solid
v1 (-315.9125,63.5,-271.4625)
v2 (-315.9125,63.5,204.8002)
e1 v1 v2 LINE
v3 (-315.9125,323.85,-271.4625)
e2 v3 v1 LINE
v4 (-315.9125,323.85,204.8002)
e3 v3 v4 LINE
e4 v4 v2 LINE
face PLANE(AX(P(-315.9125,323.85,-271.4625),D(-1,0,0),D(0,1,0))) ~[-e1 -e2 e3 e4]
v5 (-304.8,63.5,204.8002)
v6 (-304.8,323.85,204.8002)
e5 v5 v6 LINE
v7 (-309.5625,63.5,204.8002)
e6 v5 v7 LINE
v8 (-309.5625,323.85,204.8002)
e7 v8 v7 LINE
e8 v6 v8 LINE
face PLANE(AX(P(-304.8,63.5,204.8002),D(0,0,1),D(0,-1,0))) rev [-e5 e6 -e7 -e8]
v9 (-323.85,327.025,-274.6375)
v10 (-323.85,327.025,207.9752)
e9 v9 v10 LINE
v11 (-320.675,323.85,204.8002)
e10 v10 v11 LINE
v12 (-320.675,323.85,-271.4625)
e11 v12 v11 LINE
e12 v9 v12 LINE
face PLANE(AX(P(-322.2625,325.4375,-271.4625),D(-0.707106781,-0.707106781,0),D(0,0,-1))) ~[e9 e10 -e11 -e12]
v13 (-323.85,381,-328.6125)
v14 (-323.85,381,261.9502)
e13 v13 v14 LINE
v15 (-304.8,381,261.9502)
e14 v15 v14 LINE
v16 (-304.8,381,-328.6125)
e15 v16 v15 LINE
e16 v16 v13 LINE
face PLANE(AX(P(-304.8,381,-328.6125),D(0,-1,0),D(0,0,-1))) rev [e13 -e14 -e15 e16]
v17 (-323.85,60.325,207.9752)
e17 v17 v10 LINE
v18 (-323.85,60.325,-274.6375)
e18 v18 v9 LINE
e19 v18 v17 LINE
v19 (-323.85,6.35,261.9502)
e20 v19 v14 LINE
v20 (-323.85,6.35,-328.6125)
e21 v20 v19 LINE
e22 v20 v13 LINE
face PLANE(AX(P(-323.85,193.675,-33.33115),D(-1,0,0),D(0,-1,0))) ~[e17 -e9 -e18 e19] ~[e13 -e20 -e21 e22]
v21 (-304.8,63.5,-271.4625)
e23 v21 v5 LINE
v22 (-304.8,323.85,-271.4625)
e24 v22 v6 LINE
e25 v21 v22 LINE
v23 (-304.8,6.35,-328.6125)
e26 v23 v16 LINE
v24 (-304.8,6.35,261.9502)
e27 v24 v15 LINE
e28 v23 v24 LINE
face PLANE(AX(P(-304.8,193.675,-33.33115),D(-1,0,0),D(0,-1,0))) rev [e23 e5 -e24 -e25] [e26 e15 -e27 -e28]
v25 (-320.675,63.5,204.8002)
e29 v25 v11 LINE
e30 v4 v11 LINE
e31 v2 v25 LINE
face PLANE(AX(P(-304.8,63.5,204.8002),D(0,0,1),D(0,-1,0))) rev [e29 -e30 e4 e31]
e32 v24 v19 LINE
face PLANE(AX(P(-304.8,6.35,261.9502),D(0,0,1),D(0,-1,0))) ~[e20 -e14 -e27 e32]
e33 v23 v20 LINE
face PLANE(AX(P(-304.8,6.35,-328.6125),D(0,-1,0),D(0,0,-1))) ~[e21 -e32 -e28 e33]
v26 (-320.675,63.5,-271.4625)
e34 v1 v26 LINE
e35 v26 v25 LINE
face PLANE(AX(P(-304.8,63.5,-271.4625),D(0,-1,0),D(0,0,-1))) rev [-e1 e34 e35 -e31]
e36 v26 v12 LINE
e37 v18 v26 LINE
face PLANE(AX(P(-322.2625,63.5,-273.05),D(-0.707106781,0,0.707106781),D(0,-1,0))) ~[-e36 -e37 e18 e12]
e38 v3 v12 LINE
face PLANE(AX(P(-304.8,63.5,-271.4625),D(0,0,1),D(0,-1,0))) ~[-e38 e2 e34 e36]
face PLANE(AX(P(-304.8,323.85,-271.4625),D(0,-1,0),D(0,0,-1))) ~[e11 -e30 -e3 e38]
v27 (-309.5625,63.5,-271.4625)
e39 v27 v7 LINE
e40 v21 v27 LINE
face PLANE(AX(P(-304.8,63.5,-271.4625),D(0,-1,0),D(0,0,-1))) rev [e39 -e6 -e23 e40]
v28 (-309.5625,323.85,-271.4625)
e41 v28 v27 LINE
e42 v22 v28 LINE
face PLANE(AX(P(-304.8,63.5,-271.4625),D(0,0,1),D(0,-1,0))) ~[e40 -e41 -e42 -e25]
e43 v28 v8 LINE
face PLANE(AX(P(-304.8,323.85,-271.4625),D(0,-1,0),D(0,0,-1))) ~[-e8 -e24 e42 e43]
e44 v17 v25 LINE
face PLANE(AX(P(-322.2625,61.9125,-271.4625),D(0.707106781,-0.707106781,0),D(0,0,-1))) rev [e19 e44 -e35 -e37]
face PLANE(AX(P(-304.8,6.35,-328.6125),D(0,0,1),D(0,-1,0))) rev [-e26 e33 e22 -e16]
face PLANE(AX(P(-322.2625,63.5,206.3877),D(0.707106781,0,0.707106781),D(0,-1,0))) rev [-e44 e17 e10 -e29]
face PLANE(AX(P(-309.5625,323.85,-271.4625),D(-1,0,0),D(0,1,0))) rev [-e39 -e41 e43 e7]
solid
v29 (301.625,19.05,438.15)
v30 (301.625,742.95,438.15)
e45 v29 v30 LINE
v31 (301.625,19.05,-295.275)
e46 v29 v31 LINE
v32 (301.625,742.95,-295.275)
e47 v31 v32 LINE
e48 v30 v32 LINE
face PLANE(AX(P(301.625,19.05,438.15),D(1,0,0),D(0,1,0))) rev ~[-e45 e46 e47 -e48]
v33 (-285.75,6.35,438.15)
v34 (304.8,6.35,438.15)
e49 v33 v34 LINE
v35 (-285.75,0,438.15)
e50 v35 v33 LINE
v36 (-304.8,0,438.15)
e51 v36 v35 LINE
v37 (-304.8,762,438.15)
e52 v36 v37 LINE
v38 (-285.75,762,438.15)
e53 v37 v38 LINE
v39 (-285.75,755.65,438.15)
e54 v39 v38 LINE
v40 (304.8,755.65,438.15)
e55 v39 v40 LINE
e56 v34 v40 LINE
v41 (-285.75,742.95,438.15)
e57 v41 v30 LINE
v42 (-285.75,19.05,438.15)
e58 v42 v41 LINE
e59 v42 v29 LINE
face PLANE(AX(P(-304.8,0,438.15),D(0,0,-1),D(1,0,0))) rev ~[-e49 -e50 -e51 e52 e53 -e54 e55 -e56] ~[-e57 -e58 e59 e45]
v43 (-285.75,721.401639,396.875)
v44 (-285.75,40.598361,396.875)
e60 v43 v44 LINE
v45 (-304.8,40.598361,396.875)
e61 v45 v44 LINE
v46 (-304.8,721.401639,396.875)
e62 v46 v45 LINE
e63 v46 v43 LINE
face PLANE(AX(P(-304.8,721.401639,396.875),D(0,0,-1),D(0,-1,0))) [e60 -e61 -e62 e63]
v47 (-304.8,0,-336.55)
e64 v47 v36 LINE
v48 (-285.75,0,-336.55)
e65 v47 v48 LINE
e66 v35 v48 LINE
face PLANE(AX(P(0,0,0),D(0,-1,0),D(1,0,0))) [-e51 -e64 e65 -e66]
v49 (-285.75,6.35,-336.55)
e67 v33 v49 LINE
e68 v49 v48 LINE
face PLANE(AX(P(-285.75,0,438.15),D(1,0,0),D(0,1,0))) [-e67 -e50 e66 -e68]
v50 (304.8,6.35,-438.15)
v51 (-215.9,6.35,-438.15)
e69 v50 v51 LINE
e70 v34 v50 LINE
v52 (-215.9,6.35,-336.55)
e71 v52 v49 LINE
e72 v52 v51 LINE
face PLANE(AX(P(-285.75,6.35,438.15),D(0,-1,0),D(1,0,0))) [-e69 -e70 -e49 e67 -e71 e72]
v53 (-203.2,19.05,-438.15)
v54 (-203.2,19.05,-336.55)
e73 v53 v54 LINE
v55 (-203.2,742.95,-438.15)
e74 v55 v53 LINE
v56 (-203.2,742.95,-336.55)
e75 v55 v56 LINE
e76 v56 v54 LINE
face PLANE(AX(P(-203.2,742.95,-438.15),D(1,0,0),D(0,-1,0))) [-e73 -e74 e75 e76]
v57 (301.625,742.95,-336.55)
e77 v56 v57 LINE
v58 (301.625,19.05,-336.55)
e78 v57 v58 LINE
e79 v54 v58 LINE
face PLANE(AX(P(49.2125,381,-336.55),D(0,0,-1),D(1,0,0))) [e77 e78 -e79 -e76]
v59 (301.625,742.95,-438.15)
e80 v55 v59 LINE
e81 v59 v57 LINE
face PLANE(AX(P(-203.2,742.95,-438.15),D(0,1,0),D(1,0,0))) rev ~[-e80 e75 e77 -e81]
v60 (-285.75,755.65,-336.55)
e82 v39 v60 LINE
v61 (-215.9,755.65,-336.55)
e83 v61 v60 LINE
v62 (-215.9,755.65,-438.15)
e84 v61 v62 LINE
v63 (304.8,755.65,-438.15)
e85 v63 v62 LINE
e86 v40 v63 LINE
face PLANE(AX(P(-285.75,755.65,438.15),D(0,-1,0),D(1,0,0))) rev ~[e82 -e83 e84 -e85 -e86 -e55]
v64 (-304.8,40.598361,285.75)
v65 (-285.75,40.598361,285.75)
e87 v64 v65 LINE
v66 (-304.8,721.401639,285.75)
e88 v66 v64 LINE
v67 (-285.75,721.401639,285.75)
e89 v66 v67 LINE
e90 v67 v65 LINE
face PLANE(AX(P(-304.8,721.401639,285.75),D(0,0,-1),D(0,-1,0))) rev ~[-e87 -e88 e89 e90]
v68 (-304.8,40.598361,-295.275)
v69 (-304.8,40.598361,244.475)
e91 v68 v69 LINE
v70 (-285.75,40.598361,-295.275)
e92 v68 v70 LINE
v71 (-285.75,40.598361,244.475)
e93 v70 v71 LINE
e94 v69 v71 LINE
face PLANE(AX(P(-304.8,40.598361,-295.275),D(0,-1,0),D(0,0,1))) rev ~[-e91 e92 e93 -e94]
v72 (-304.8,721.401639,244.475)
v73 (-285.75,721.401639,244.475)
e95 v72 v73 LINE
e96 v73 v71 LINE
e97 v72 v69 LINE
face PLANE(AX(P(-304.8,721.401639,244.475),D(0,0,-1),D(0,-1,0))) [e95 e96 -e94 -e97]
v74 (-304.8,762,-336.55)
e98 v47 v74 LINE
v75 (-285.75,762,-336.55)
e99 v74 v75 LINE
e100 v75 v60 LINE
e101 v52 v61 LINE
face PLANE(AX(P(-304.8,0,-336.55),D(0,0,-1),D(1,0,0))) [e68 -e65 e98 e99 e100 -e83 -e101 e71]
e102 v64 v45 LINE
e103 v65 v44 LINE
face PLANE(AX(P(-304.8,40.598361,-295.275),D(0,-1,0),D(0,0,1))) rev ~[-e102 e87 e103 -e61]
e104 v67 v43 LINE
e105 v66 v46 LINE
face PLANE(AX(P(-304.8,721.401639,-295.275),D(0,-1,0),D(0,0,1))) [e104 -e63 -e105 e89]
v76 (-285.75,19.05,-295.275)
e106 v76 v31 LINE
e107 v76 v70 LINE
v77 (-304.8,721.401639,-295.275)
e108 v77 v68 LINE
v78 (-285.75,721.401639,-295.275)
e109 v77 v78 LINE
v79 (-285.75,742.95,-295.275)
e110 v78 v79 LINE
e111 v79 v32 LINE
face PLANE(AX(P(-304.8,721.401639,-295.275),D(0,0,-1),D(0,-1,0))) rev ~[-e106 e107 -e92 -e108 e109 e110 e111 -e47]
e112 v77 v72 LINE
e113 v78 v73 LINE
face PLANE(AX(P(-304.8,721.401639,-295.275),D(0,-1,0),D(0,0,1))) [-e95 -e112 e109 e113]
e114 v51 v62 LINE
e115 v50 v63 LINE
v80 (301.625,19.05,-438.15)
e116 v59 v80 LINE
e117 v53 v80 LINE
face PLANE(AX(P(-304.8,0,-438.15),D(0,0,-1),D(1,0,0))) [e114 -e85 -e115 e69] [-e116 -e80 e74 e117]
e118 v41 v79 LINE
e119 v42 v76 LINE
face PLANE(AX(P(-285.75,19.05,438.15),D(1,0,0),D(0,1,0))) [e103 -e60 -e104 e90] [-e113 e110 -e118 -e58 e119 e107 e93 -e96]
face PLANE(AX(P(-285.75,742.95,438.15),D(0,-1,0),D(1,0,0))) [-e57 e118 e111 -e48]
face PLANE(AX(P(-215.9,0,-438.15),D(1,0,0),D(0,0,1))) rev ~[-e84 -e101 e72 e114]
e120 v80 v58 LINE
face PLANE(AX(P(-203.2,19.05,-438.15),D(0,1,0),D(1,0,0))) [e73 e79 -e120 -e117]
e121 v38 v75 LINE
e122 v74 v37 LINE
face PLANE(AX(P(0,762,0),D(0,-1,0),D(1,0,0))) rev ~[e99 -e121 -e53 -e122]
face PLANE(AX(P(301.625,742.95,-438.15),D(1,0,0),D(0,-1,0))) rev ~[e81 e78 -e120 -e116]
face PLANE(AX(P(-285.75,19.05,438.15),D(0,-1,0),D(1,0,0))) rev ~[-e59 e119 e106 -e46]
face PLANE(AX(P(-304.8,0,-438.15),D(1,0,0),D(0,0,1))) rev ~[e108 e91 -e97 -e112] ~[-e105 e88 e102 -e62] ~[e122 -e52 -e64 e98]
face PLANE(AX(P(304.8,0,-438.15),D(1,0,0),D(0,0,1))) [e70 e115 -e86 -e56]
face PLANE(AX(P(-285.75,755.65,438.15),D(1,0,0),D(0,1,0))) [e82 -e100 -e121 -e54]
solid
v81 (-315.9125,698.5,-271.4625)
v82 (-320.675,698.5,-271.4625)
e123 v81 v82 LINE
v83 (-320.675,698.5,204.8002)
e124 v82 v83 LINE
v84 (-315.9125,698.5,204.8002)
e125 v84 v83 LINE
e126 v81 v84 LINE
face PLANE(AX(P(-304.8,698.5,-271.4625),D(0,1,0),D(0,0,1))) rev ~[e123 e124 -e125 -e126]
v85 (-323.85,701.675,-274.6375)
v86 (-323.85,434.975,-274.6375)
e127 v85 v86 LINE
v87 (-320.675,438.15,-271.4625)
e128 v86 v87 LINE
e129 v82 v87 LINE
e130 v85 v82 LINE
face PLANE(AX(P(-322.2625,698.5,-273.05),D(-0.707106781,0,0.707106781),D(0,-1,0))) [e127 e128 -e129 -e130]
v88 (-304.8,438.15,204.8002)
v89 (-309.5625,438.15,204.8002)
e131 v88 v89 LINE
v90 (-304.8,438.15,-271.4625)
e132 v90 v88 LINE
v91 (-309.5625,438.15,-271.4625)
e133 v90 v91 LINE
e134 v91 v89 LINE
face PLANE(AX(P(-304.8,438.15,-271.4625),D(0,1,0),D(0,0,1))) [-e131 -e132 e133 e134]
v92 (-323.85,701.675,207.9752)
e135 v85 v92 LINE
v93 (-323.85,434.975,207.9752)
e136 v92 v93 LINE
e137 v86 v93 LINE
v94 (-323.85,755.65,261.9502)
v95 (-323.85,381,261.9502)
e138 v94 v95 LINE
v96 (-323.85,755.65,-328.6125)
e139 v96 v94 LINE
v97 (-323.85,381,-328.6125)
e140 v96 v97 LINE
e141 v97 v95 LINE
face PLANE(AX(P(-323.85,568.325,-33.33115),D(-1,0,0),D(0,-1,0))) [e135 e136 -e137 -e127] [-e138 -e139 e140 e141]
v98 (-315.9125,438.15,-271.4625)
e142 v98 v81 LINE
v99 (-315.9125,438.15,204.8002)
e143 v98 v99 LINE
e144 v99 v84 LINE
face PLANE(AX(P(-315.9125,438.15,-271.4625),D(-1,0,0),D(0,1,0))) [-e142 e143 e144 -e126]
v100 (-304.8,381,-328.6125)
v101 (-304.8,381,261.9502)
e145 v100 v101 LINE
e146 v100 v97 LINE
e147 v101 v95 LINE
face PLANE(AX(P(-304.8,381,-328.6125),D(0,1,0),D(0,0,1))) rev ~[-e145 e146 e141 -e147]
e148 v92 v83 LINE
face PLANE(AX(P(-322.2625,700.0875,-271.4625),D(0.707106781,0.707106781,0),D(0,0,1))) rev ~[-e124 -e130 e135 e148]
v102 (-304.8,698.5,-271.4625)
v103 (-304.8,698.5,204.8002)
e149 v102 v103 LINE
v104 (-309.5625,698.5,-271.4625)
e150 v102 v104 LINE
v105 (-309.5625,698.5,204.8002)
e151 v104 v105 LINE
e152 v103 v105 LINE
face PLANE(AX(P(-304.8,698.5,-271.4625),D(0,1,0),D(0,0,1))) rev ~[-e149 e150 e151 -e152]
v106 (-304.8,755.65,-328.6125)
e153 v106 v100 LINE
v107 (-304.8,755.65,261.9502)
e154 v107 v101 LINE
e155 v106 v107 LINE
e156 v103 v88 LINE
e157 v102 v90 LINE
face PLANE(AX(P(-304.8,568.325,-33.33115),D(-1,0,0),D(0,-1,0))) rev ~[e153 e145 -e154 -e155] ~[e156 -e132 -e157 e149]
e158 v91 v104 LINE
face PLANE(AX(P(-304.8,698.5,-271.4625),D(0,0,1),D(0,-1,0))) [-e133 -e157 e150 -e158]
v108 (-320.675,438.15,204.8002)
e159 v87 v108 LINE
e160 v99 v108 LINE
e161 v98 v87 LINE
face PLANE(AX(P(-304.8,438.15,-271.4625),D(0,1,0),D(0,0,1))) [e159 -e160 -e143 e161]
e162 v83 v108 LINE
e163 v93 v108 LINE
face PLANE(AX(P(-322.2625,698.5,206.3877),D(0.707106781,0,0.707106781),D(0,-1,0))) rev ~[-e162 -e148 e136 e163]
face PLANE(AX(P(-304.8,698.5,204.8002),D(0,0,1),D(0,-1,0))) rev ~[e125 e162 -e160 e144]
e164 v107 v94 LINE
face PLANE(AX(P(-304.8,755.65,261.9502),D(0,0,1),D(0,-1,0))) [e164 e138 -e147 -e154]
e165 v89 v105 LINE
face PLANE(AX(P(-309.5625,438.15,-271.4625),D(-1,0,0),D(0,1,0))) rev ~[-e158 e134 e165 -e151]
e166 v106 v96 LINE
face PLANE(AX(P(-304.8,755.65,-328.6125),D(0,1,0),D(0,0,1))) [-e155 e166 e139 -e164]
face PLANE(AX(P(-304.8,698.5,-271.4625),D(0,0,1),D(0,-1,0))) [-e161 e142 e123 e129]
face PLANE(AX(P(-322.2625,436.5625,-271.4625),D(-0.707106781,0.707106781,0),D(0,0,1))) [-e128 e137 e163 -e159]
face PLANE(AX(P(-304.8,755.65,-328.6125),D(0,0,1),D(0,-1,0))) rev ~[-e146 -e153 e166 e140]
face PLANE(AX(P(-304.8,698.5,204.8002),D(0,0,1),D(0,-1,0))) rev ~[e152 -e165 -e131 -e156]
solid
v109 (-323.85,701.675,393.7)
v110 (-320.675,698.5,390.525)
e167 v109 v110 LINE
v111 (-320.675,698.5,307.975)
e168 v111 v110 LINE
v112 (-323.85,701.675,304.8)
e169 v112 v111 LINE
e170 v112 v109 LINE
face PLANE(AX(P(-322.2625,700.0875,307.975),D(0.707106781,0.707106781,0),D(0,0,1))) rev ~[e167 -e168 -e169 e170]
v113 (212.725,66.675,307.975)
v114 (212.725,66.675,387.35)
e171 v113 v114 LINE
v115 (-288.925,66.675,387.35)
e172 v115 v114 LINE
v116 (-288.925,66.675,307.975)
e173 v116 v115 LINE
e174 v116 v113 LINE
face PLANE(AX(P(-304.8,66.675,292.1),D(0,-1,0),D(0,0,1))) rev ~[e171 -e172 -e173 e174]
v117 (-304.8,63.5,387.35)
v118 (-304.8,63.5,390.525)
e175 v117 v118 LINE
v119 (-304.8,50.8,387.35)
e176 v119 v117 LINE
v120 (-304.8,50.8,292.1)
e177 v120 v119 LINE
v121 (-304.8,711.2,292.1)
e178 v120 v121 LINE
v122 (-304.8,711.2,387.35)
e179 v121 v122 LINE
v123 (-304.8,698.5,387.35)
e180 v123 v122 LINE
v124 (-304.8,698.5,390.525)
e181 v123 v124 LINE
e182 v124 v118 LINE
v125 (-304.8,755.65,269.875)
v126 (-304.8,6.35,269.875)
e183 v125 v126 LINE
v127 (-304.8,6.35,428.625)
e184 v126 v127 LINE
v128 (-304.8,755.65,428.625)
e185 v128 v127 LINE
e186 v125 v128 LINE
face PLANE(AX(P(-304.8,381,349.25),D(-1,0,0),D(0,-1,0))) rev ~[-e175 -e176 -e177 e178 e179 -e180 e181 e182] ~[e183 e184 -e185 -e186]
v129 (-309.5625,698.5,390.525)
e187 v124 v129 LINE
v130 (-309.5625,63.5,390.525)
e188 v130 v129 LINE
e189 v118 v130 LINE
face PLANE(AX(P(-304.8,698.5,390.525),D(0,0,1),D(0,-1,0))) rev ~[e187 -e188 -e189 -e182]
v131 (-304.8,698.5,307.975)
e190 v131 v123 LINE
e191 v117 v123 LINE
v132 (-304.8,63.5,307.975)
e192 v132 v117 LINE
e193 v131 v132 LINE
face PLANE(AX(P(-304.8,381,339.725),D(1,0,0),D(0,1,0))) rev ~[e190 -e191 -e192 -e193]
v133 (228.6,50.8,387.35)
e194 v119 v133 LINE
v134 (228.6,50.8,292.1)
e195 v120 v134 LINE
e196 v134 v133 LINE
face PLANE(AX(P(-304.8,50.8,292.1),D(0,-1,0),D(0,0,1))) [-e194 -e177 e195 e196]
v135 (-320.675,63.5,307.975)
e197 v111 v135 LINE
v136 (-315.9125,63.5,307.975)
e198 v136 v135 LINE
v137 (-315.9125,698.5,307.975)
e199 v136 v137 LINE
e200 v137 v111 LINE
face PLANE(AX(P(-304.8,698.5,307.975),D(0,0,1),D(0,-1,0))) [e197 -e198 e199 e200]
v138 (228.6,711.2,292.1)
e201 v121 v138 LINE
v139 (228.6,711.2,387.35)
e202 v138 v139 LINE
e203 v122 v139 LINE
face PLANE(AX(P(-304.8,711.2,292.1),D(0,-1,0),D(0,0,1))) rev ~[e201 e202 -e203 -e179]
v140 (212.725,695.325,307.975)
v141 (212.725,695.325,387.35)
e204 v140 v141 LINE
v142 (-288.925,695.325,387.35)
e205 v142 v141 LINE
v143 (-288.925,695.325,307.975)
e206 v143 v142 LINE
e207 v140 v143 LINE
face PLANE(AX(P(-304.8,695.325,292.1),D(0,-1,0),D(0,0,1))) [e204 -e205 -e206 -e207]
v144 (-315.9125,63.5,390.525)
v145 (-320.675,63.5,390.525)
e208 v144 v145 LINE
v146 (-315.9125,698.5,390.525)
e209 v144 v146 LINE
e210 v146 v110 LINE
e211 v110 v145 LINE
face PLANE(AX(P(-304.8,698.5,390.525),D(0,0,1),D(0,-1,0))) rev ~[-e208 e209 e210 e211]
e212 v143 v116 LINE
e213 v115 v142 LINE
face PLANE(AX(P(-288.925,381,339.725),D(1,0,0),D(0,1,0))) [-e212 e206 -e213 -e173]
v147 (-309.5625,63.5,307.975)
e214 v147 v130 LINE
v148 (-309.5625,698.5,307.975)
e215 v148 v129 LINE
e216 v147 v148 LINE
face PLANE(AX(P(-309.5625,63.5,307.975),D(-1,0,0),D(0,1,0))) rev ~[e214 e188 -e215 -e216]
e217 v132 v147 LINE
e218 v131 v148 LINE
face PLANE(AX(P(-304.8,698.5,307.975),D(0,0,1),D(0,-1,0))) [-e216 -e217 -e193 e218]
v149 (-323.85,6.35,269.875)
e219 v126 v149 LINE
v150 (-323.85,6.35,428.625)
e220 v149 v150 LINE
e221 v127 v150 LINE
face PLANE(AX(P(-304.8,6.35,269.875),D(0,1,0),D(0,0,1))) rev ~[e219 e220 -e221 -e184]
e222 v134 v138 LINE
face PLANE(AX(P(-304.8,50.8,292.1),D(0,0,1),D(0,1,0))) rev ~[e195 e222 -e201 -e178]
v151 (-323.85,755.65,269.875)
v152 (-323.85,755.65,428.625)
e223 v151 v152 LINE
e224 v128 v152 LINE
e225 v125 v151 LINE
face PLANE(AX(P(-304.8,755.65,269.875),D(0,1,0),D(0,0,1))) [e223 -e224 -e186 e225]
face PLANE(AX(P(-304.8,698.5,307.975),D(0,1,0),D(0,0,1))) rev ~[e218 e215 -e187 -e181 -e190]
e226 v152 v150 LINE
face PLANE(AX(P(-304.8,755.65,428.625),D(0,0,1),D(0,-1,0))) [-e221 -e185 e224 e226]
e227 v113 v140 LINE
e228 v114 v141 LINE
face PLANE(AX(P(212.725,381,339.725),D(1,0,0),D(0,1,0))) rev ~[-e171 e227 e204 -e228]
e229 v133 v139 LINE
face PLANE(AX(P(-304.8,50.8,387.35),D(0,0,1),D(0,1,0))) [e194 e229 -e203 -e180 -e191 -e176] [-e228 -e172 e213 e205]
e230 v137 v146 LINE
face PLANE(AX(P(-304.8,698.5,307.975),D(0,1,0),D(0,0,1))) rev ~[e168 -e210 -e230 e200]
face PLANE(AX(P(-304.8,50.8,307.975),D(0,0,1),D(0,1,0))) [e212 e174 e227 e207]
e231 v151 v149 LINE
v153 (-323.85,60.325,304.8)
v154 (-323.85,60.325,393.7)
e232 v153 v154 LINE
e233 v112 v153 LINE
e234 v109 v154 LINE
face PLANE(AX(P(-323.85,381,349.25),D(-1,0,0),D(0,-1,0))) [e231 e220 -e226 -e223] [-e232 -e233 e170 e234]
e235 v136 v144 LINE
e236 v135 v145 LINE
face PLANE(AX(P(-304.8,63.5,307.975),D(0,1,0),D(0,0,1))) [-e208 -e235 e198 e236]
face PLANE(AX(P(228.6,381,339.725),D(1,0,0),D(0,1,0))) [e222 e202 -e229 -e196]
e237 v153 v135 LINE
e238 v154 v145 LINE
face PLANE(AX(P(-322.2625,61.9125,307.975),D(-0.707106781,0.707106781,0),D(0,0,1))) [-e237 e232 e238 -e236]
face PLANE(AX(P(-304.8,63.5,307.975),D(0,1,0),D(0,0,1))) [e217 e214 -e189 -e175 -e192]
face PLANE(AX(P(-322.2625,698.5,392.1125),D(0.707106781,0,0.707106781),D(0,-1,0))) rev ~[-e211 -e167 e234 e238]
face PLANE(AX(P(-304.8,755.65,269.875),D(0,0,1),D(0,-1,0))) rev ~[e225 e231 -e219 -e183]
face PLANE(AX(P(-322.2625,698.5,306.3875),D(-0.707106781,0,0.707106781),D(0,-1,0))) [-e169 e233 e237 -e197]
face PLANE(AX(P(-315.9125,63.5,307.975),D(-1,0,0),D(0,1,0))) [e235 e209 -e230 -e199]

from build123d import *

# Parameters (mm, degrees)
F0_W          = 609.6
F0_H          = 876.3
F1_DEPTH      = 762
F2_W          = 88.9
F2_H          = 101.6
F3_DEPTH      = 762.001
F4_W          = 680.8032786885
F4_H          = 692.15
F5_DEPTH      = 19.05
F6_W          = 590.55
F6_H          = 6.35
F7_DEPTH      = 876.301
F8_W          = 587.375
F8_H          = 723.9
F9_DEPTH      = 733.425
F10_W         = 680.8032786885
F10_H         = 41.275
F11_DEPTH     = 19.05
F12_W         = 374.65
F12_H         = 590.5627
F12_W_2       = 260.35
F12_H_2       = 476.2627
F13_DEPTH     = 19.05
F14_W         = 6.35
F14_H         = 260.35
F15_DEPTH     = 476.2627
F16_SIZE      = 3.175
F17_W         = 749.3
F17_H         = 158.75
F17_W_2       = 635
F17_H_2       = 82.55
F18_DEPTH     = 19.05
F19_W         = 6.35
F19_H         = 635
F20_DEPTH     = 82.55
F21_SIZE      = 3.175
F22_W         = 504.825
F22_H         = 723.9
F23_DEPTH     = 101.6
F24_W         = 660.4
F24_H         = 95.25
F25_DEPTH     = 533.4
F26_T         = 15.875
F26_T3_DEPTH  = 37.249261314
F26_T5_DEPTH  = 37.249261314
F26_T7_DEPTH  = 37.249261314
F26_T9_DEPTH  = 37.249261314
F26_T11_DEPTH = 36.5125
F26_T13_DEPTH = 666.75
F26_T15_DEPTH = 114.3
F26_T17_DEPTH = 127
F26_T19_DEPTH = 692.15
F26_T21_DEPTH = 111.125
F26_T23_DEPTH = 36.5125


# Not quite as in the source:
# - a shell that OpenCascade refuses in one call is made with other operations: the cavity is built on its own and cut out


with BuildPart() as f1:
    # F0 (on Front) → F1 (new body)
    with BuildSketch(Plane.XZ):
        Rectangle(F0_W, F0_H)
    extrude(amount=-F1_DEPTH)

    # F2 (on face) → F3 (cut, through all)
    with BuildSketch(Plane.XZ):
        with Locations((-260.35, -387.35)):
            Rectangle(F2_W, F2_H)
    extrude(amount=-F3_DEPTH, mode=Mode.SUBTRACT)

    # F4 (on face) → F5 (cut)
    with BuildSketch(Plane(origin=(-304.8, 0, 0), x_dir=(0, -1, 0), z_dir=(-1, 0, 0))):
        with Locations((-381, 50.8)):
            Rectangle(F4_W, F4_H)
    extrude(amount=-F5_DEPTH, mode=Mode.SUBTRACT)

    # F6 (on face) → F7 (cut, through all)
    with BuildSketch(Plane.XY.offset(438.15)):
        with Locations((9.525, 758.825)):
            Rectangle(F6_W, F6_H)
        with Locations((9.525, 3.175)):
            Rectangle(F6_W, F6_H)
    extrude(amount=-F7_DEPTH, mode=Mode.SUBTRACT)

    # F8 (on face) → F9 (cut, through all)
    with BuildSketch(Plane.XY.offset(438.15)):
        with Locations((7.9375, 381)):
            Rectangle(F8_W, F8_H)
    extrude(amount=-F9_DEPTH, mode=Mode.SUBTRACT)

    # F10 (on face) → F11 (join, through all)
    with BuildSketch(Plane(origin=(-304.8, 0, 0), x_dir=(0, -1, 0), z_dir=(-1, 0, 0))):
        with Locations((-381, 265.1125)):
            Rectangle(F10_W, F10_H)
    extrude(amount=-F11_DEPTH)

    # F22 (on face) → F23 (cut)
    with BuildSketch(Plane(origin=(0, 0, -438.15), x_dir=(1, 0, 0), z_dir=(0, 0, -1))):
        with Locations((49.2125, -381)):
            Rectangle(F22_W, F22_H)
    extrude(amount=-F23_DEPTH, mode=Mode.SUBTRACT)


with BuildPart() as f13:
    # F12 (on face) → F13 (new body)
    with BuildSketch(Plane(origin=(-304.8, 0, 0), x_dir=(0, -1, 0), z_dir=(-1, 0, 0))):
        with Locations((-568.325, -33.33115)):
            Rectangle(F12_W, F12_H)
        with Locations((-568.325, -33.33115)):
            Rectangle(F12_W_2, F12_H_2, mode=Mode.SUBTRACT)
    extrude(amount=F13_DEPTH)

    # F14 (on face) → F15 (join, through all)
    with BuildSketch(Plane.XY.offset(-271.4625)):
        with Locations((-312.7375, 568.325)):
            Rectangle(F14_W, F14_H)
    extrude(amount=F15_DEPTH)

    # F16
    f16_edges = [f13.edges().sort_by_distance(p)[0] for p in [
        (-323.85, 698.5, -33.33115),
        (-323.85, 568.325, -271.4625),
        (-323.85, 438.15, -33.33115),
        (-323.85, 568.325, 204.8002),
    ]]
    chamfer(f16_edges, length=F16_SIZE)


with BuildPart() as f18:
    # F17 (on face) → F18 (new body)
    with BuildSketch(Plane(origin=(-304.8, 0, 0), x_dir=(0, -1, 0), z_dir=(-1, 0, 0))):
        with Locations((-381, 349.25)):
            Rectangle(F17_W, F17_H)
        with Locations((-381, 349.25)):
            Rectangle(F17_W_2, F17_H_2, mode=Mode.SUBTRACT)
    extrude(amount=F18_DEPTH)

    # F19 (on face) → F20 (join, through all)
    with BuildSketch(Plane.XY.offset(307.975)):
        with Locations((-312.7375, 381)):
            Rectangle(F19_W, F19_H)
    extrude(amount=F20_DEPTH)

    # F21
    f21_edges = [f18.edges().sort_by_distance(p)[0] for p in [
        (-323.85, 381, 307.975),
        (-323.85, 698.5, 349.25),
        (-323.85, 381, 390.525),
        (-323.85, 63.5, 349.25),
    ]]
    chamfer(f21_edges, length=F21_SIZE)

    # F24 (on face) → F25 (join)
    with BuildSketch(Plane.YZ.offset(-304.8)):
        with Locations((381, 339.725)):
            Rectangle(F24_W, F24_H)
    extrude(amount=F25_DEPTH)

    # F26: shell of thickness 15.875, made by hand


with BuildPart() as f26_core1:
    # F26_t2: copy of F18
    add(f18.part)

    # the walls: a layer under each face that stays
    f26_faces = [f26_core1.faces().sort_by_distance(p)[0] for p in [
        (-323.85, 630.7666666667, 296.3333333333),
        (-322.2625, 381, 306.3875),
        (-322.2625, 61.9125, 349.25),
        (-322.2625, 700.0875, 349.25),
        (-322.2625, 381, 392.1125),
        (-314.325, 381, 428.625),
        (-314.325, 755.65, 349.25),
        (-314.325, 381, 269.875),
        (-314.325, 6.35, 349.25),
        (-318.29375, 381, 307.975),
        (-318.29375, 63.5, 349.25),
        (-318.29375, 698.5, 349.25),
        (-318.29375, 381, 390.525),
        (-304.8, 630.7666666667, 402.1666666667),
        (-315.9125, 381, 349.25),
        (-38.1, 711.2, 339.725),
        (-38.1, 381, 292.1),
        (-38.1, 50.8, 339.725),
        (-307.18125, 63.5, 349.25),
        (-307.18125, 381, 390.525),
        (-307.18125, 698.5, 349.25),
        (-304.8, 381, 347.6625),
        (228.6, 381, 339.725),
        (-307.18125, 381, 307.975),
        (-309.5625, 381, 349.25),
    ]]
    thicken(f26_faces, amount=-F26_T, mode=Mode.SUBTRACT)

    # F26_s4 → F26_t3 (cut)
    with BuildSketch(Plane(origin=(4.5928978099, 4.5928978099, 4.5928978099), x_dir=(-0.7071067812, 0.7071067812, 0), z_dir=(0.5773502692, 0.5773502692, 0.5773502692))):
        Polygon((271.8908726623, 356.5892701441), (263.7152476623, 342.7036353262), (255.7777476623, 347.2863530879), (255.7777476623, 356.4517886113), align=None)
    extrude(amount=F26_T3_DEPTH, mode=Mode.SUBTRACT)

    # F26_s6 → F26_t5 (cut)
    with BuildSketch(Plane(origin=(-249.4071021901, 249.40710219, -249.4071021901), x_dir=(0.7071067812, 0.7071067812, 0), z_dir=(0.5773502692, -0.5773502692, 0.5773502692))):
        Polygon((266.9244946018, 667.6744674776), (275.1001196018, 653.7888326596), (283.0376196018, 658.3715504213), (283.0376196018, 667.5369859447), align=None)
    extrude(amount=F26_T5_DEPTH, mode=Mode.SUBTRACT)

    # F26_s8 → F26_t7 (cut)
    with BuildSketch(Plane(origin=(-228.2404355234, -228.2404355234, 228.2404355234), x_dir=(-0.7071067812, 0.7071067812, 0), z_dir=(0.5773502692, 0.5773502692, -0.5773502692))):
        Polygon((271.8908726623, 213.7335916339), (255.7777476623, 213.8710731668), (255.7777476623, 223.0365086901), (263.7152476623, 227.6192264518), align=None)
    extrude(amount=F26_T7_DEPTH, mode=Mode.SUBTRACT)

    # F26_s10 → F26_t9 (cut)
    with BuildSketch(Plane(origin=(-482.2404355234, 482.2404355234, 482.2404355234), x_dir=(0.7071067812, 0.7071067812, 0), z_dir=(0.5773502692, -0.5773502692, -0.5773502692))):
        Polygon((266.9244946018, -97.3516056996), (283.0376196018, -97.2141241667), (283.0376196018, -88.0486886433), (275.1001196018, -83.4659708816), align=None)
    extrude(amount=F26_T9_DEPTH, mode=Mode.SUBTRACT)

    # F26_s12 → F26_t11 (cut)
    with BuildSketch(Plane.YZ.offset(-336.55)):
        Polygon((698.34125, 308.13375), (698.5, 292.1), (714.375, 292.1), (714.375, 307.975), align=None)
        Polygon((63.65875, 308.13375), (63.5, 292.1), (47.625, 292.1), (47.625, 307.975), align=None)
        Polygon((63.65875, 390.36625), (47.625, 390.525), (47.625, 406.4), (63.5, 406.4), align=None)
        Polygon((698.34125, 390.36625), (714.375, 390.525), (714.375, 406.4), (698.5, 406.4), align=None)
    extrude(amount=F26_T11_DEPTH, mode=Mode.SUBTRACT)

    # F26_s14 → F26_t13 (cut)
    with BuildSketch(Plane.XZ.offset(-714.375)):
        Polygon((-316.07125, 308.13375), (-315.9125, 292.1), (-300.0375, 292.1), (-300.0375, 307.975), align=None)
        Polygon((-316.07125, 390.36625), (-315.9125, 406.4), (-300.0375, 406.4), (-300.0375, 390.525), align=None)
        Polygon((-309.40375, 390.36625), (-309.5625, 406.4), (-325.4375, 406.4), (-325.4375, 390.525), align=None)
        Polygon((-304.95875, 308.13375), (-288.925, 307.975), (-288.925, 292.1), (-304.8, 292.1), align=None)
        Polygon((-309.40375, 308.13375), (-309.5625, 292.1), (-325.4375, 292.1), (-325.4375, 307.975), align=None)
    extrude(amount=F26_T13_DEPTH, mode=Mode.SUBTRACT)

    # F26_s16 → F26_t15 (cut)
    with BuildSketch(Plane.XY.offset(292.1)):
        Polygon((-316.07125, 63.65875), (-315.9125, 47.625), (-300.0375, 47.625), (-300.0375, 63.5), align=None)
        Polygon((-316.07125, 698.34125), (-315.9125, 714.375), (-300.0375, 714.375), (-300.0375, 698.5), align=None)
        Polygon((-309.40375, 63.65875), (-309.5625, 47.625), (-325.4375, 47.625), (-325.4375, 63.5), align=None)
        Polygon((-309.40375, 698.34125), (-309.5625, 714.375), (-325.4375, 714.375), (-325.4375, 698.5), align=None)
    extrude(amount=F26_T15_DEPTH, mode=Mode.SUBTRACT)

    # F26_s18 → F26_t17 (cut)
    with BuildSketch(Plane.XY.offset(276.225)):
        Polygon((-304.64125, 711.35875), (-320.675, 711.2), (-320.675, 695.325), (-304.8, 695.325), align=None)
        Polygon((-304.64125, 50.64125), (-320.675, 50.8), (-320.675, 66.675), (-304.8, 66.675), align=None)
    extrude(amount=F26_T17_DEPTH, mode=Mode.SUBTRACT)

    # F26_s20 → F26_t19 (cut)
    with BuildSketch(Plane.XZ.offset(-727.075)):
        Polygon((-304.64125, 291.94125), (-320.675, 292.1), (-320.675, 307.975), (-304.8, 307.975), align=None)
    extrude(amount=F26_T19_DEPTH, mode=Mode.SUBTRACT)

    # F26_s22 → F26_t21 (cut)
    with BuildSketch(Plane.XY.offset(292.1)):
        Polygon((-304.95875, 63.65875), (-304.8, 47.625), (-288.925, 47.625), (-288.925, 63.5), align=None)
        Polygon((-304.95875, 698.34125), (-304.8, 714.375), (-288.925, 714.375), (-288.925, 698.5), align=None)
    extrude(amount=F26_T21_DEPTH, mode=Mode.SUBTRACT)

    # F26_s24 → F26_t23 (cut)
    with BuildSketch(Plane.YZ.offset(-325.4375)):
        Polygon((63.65875, 308.13375), (47.625, 307.975), (47.625, 292.1), (63.5, 292.1), align=None)
        Polygon((63.65875, 390.36625), (47.625, 390.525), (47.625, 406.4), (63.5, 406.4), align=None)
        Polygon((698.34125, 390.36625), (698.5, 406.4), (714.375, 406.4), (714.375, 390.525), align=None)
        Polygon((698.34125, 308.13375), (714.375, 307.975), (714.375, 292.1), (698.5, 292.1), align=None)
    extrude(amount=F26_T23_DEPTH, mode=Mode.SUBTRACT)


with BuildPart() as f18_1:
    add(f18.part)

    # what is left inside the walls is the cavity
    f26_cavity = [f26_core1.part.solids().sort_by_distance(p)[0] for p in [
        (45.508333, 381, 308.13375),
    ]]
    add(f26_cavity, mode=Mode.SUBTRACT)


with BuildPart() as f27_1:
    # F27: instance of F13
    add(f13.part.mirror(Plane(origin=(-314.325, 381, -33.33115), x_dir=(1, 0, 0), z_dir=(0, -1, 0))))


solid = Compound([f1.part, f13.part, f18_1.part, f27_1.part])
